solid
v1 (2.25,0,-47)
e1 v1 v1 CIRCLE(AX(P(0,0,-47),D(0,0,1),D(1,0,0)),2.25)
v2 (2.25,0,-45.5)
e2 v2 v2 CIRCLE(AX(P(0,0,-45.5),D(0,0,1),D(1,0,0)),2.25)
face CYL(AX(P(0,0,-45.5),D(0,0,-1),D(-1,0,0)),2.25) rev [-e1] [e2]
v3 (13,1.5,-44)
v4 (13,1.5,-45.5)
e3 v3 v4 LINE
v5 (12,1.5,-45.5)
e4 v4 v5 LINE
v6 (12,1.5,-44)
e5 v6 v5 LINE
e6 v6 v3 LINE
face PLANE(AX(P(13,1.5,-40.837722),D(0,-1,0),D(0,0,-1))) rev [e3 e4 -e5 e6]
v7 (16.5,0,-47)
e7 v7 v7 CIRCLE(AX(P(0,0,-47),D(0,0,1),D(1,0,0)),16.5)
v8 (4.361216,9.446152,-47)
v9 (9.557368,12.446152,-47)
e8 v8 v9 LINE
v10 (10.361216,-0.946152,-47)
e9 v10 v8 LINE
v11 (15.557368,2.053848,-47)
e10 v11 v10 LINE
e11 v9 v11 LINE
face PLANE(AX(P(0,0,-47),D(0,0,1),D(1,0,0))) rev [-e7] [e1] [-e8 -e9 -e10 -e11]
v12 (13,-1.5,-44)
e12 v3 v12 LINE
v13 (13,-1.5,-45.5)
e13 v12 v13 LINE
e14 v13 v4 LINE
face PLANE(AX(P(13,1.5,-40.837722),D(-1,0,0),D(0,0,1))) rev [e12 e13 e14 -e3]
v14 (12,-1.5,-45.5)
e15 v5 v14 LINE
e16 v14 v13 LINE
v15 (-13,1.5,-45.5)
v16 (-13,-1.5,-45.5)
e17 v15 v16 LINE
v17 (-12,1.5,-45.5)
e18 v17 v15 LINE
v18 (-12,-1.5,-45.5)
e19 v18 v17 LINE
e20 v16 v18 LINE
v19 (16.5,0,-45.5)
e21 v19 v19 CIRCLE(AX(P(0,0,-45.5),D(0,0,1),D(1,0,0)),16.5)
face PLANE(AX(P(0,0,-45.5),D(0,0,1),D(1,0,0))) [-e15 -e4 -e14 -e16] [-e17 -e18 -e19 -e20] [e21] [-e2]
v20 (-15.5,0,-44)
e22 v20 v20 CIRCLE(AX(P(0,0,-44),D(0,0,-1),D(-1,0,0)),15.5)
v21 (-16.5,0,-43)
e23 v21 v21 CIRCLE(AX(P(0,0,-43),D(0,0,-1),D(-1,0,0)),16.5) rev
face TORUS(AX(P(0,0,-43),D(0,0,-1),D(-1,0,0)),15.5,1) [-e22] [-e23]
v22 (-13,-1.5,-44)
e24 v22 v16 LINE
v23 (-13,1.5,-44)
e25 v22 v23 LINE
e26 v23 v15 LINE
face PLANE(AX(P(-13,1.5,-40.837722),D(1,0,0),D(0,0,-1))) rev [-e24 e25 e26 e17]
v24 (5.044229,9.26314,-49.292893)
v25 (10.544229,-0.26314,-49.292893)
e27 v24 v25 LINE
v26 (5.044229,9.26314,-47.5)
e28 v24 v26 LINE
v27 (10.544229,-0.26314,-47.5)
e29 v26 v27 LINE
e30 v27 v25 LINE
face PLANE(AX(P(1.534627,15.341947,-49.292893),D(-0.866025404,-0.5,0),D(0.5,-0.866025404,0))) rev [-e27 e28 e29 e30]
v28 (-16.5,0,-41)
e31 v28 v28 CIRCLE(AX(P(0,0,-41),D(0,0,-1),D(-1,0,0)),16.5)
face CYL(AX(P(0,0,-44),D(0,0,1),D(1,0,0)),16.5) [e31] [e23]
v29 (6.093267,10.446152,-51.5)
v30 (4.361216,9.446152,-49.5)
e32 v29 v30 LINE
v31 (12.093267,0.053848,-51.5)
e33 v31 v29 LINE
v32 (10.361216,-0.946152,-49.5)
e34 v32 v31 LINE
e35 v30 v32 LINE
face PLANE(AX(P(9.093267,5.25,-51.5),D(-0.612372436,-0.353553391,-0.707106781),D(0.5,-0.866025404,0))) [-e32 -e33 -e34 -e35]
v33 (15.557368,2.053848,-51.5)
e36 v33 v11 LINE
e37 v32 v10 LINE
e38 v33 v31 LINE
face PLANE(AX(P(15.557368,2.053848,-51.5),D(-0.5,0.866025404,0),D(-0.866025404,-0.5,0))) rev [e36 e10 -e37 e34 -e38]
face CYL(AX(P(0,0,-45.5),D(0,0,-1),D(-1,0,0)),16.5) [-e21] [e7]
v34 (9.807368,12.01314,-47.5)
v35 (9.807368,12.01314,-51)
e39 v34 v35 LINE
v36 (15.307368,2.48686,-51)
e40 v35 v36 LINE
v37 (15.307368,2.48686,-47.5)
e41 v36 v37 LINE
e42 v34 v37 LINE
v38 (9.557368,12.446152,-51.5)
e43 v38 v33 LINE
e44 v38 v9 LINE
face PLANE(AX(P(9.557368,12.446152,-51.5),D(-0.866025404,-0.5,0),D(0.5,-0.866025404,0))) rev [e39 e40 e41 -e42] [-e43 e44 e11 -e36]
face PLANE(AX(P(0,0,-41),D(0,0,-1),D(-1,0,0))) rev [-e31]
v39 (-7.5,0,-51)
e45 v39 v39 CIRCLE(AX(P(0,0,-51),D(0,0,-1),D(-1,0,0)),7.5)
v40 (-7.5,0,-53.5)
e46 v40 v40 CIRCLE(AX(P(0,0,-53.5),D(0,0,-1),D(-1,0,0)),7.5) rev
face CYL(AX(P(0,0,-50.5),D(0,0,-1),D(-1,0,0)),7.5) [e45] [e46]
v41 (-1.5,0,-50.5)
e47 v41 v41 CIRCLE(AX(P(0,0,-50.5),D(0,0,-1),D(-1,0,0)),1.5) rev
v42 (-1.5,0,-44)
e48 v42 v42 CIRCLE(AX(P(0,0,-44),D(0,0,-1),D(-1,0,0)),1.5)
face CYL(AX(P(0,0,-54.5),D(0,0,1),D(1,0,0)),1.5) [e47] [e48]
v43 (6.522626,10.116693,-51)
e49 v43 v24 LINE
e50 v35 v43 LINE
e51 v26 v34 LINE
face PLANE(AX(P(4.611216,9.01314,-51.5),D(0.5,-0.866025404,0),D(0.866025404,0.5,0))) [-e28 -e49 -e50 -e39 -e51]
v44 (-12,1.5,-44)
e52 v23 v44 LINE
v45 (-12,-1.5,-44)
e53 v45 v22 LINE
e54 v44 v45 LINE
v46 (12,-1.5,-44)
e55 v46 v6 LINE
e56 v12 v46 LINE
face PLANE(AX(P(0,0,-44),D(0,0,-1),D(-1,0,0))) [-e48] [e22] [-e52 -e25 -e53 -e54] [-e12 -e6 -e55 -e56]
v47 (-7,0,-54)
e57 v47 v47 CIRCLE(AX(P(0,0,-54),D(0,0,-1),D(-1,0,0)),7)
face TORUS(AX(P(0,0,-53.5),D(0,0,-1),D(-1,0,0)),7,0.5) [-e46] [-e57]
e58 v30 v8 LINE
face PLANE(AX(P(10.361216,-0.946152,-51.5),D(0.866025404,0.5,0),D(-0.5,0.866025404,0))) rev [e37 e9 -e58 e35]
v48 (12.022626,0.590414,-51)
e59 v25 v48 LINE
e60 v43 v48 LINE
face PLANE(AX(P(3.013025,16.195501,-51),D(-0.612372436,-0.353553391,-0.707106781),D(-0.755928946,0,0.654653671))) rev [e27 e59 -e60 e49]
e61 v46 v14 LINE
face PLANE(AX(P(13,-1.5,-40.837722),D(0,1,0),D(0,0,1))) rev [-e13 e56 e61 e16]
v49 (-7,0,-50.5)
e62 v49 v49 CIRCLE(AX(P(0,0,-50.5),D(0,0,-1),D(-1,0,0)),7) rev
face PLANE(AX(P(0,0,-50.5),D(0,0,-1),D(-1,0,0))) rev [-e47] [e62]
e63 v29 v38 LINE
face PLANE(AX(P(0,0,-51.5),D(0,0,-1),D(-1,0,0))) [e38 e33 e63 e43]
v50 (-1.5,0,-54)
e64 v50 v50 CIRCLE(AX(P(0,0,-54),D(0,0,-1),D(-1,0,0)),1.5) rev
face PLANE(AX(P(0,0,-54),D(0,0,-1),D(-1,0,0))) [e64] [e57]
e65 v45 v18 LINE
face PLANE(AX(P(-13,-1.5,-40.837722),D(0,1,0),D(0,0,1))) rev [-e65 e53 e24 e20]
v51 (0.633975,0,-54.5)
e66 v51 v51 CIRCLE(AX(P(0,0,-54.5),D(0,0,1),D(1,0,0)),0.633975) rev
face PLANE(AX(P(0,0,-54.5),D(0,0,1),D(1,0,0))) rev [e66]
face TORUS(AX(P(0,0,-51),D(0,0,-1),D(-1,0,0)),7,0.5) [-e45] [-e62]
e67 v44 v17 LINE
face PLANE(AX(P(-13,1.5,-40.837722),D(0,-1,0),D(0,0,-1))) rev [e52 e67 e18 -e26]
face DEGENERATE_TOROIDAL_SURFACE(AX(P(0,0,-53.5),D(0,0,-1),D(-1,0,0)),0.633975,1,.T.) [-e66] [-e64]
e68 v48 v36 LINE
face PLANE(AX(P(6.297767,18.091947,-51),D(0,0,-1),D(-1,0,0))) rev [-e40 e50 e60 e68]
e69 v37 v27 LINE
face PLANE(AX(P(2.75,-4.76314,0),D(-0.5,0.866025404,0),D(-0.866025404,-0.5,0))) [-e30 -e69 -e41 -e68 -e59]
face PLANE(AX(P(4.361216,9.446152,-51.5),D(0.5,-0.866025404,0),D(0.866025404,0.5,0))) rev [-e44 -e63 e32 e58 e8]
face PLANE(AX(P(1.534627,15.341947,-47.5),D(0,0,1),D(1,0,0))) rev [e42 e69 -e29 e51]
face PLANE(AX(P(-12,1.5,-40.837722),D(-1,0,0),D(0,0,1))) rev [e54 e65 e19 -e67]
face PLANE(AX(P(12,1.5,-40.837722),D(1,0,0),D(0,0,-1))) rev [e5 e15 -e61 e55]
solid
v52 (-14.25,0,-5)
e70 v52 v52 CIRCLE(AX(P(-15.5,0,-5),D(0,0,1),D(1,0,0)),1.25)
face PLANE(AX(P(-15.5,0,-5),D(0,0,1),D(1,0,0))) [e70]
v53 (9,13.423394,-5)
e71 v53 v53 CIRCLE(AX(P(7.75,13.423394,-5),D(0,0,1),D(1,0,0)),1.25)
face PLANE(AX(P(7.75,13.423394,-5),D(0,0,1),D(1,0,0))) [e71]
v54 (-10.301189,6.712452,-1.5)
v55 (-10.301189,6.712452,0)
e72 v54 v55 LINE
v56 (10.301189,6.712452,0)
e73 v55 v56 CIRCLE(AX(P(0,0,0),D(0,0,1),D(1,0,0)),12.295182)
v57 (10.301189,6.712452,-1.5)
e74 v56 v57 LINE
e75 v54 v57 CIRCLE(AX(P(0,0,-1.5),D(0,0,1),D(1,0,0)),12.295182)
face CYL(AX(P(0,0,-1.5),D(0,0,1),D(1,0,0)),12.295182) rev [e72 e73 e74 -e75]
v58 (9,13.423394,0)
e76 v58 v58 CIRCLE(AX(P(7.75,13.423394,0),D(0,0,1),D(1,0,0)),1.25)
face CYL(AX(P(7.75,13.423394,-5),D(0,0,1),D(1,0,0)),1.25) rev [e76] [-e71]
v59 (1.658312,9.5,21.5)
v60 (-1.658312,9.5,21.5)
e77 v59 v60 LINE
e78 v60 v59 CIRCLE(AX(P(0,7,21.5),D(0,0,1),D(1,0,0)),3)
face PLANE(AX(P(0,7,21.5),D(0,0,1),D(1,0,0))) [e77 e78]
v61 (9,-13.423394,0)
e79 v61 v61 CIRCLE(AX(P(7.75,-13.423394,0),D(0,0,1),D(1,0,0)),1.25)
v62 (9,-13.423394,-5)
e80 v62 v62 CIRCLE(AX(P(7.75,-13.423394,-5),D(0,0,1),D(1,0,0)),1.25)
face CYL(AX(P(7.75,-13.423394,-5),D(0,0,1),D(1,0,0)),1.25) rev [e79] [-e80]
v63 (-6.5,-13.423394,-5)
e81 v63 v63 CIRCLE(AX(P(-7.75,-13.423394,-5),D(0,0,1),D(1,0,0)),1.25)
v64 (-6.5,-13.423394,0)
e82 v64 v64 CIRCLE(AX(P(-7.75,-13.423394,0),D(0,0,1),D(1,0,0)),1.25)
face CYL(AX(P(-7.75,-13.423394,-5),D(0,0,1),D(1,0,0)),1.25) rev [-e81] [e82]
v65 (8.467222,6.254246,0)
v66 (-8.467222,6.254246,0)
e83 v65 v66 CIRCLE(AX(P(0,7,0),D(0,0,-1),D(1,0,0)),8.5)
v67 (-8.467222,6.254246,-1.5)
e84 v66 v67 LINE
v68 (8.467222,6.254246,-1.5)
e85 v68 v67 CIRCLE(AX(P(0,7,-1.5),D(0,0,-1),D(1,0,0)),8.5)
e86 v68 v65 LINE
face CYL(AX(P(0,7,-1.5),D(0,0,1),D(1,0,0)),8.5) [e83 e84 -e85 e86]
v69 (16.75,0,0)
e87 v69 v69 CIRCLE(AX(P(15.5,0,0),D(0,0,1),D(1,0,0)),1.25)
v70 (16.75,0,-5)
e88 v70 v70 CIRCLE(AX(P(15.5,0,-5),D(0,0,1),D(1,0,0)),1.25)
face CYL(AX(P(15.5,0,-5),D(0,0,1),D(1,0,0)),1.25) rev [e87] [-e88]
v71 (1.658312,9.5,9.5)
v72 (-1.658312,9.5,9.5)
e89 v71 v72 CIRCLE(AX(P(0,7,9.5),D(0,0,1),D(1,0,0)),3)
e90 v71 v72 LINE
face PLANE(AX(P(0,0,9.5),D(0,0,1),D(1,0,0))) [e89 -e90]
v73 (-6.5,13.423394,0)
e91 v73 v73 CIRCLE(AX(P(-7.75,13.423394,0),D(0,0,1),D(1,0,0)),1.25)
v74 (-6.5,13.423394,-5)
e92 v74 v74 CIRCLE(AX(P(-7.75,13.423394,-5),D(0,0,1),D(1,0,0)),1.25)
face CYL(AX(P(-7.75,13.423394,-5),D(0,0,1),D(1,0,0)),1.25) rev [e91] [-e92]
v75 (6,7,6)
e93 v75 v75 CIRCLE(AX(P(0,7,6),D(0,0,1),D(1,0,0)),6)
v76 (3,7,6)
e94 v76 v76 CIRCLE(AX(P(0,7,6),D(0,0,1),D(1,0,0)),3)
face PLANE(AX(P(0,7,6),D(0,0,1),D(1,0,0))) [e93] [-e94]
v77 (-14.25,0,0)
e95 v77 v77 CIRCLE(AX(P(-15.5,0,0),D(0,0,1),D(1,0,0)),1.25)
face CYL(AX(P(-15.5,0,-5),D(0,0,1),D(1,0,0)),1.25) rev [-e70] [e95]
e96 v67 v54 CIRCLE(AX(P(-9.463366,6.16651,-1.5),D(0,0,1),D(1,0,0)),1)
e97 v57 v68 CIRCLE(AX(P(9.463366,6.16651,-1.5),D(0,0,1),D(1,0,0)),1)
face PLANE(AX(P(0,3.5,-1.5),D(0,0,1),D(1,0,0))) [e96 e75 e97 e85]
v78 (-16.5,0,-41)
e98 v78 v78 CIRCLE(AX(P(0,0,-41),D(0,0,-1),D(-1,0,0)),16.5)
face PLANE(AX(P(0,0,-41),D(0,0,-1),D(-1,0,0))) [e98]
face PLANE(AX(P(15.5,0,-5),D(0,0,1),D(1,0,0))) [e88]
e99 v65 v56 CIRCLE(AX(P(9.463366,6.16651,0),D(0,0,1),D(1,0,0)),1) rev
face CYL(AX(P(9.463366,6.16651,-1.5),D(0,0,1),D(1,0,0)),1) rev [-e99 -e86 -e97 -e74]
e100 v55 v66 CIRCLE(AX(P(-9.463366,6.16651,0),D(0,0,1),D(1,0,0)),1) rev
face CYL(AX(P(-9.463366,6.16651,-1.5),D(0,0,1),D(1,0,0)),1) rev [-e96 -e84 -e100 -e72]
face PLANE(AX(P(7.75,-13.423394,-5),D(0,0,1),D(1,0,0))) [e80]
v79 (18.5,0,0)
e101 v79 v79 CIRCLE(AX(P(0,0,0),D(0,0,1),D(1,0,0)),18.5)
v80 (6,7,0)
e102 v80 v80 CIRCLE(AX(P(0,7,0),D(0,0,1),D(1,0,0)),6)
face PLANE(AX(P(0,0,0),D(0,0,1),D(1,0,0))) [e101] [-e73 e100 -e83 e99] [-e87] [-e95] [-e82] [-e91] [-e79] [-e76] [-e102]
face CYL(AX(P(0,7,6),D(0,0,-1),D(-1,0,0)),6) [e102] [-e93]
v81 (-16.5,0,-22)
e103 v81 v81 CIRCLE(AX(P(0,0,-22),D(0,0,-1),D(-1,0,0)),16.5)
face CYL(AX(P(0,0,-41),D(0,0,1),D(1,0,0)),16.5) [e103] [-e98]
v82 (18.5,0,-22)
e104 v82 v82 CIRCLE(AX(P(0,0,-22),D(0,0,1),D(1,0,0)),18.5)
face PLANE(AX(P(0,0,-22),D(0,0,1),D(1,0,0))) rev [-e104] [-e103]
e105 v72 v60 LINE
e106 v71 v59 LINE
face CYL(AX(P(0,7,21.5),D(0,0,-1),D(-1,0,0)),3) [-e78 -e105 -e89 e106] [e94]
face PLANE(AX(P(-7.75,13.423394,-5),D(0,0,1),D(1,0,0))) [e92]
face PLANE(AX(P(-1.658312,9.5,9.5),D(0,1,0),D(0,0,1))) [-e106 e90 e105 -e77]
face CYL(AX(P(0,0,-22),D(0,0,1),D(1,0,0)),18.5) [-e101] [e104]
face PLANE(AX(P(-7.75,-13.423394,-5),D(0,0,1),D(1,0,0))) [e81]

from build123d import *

# Parameters (mm, degrees)
SKETCH1_R            = 18.5
BOSS_EXTRUDE1_DEPTH  = 22
SKETCH2_R            = 1.25
CUT_EXTRUDE1_DEPTH   = 5
SKETCH3_R            = 6
BOSS_EXTRUDE2_DEPTH  = 6
SKETCH4_R            = 3
BOSS_EXTRUDE3_DEPTH  = 15.5
SKETCH5_OUTSIDE_W    = 52.61
SKETCH5_OUTSIDE_H    = 52.61
CUT_EXTRUDE2_DEPTH   = 12
CUT_EXTRUDE3_DEPTH   = 1.5
FILLET1_R            = 1
SKETCH7_R            = 16.5
BOSS_EXTRUDE4_DEPTH  = 19
SKETCH8_R            = 16.5
BOSS_EXTRUDE5_DEPTH  = 3
FILLET2_R            = 1
BOSS_EXTRUDE6_START  = 10
SKETCH9_R            = 7.5
BOSS_EXTRUDE6_DEPTH  = 3.5
BOSS_EXTRUDE7_START  = -4
SKETCH10_R           = 1.5
BOSS_EXTRUDE7_DEPTH  = 10.5
BOSS_EXTRUDE8_START  = 5
SKETCH11_R           = 16.5
SKETCH11_R_2         = 2.25
BOSS_EXTRUDE8_DEPTH  = 1.5
SKETCH12_W           = 1
SKETCH12_H           = 3
BOSS_EXTRUDE9_DEPTH  = 1.5
BOSS_EXTRUDE10_DEPTH = 4.5
CHAMFER1_SIZE        = 2
CUT_EXTRUDE4_START   = -0.5
CUT_EXTRUDE4_DEPTH   = 11
FILLET3_R            = 1
FILLET4_R            = 0.5


with BuildPart() as part:
    # Sketch1 → Boss-Extrude1 (new body)
    with BuildSketch(Plane.XY):
        Circle(SKETCH1_R)
    extrude(amount=-BOSS_EXTRUDE1_DEPTH)

    # Sketch2 → Cut-Extrude1 (cut)
    with BuildSketch(Plane.XY):
        with Locations((-15.5, 0)):
            Circle(SKETCH2_R)
        with Locations((-7.75, 13.423393759)):
            Circle(SKETCH2_R)
        with Locations((7.75, 13.423393759)):
            Circle(SKETCH2_R)
        with Locations((15.5, 0)):
            Circle(SKETCH2_R)
        with Locations((7.75, -13.423393759)):
            Circle(SKETCH2_R)
        with Locations((-7.75, -13.423393759)):
            Circle(SKETCH2_R)
    extrude(amount=-CUT_EXTRUDE1_DEPTH, mode=Mode.SUBTRACT)

    # Sketch3 → Boss-Extrude2 (add)
    with BuildSketch(Plane.XY):
        with Locations((0, 7)):
            Circle(SKETCH3_R)
    extrude(amount=BOSS_EXTRUDE2_DEPTH)

    # Sketch4 → Boss-Extrude3 (add)
    with BuildSketch(Plane.XY.offset(6)):
        with Locations((0, 7)):
            Circle(SKETCH4_R)
    extrude(amount=BOSS_EXTRUDE3_DEPTH)

    # Sketch5 outside → Cut-Extrude2 (cut)
    with BuildSketch(Plane.XY.offset(21.5)):
        Rectangle(SKETCH5_OUTSIDE_W, SKETCH5_OUTSIDE_H)
        with BuildLine():
            Line((-1.658312395, 9.5), (1.658312395, 9.5))
            ThreePointArc((1.658312395, 9.5), (0, 4), (-1.658312395, 9.5))
        make_face(mode=Mode.SUBTRACT)
    extrude(amount=-CUT_EXTRUDE2_DEPTH, mode=Mode.SUBTRACT)

    # Sketch6 → Cut-Extrude3 (cut)
    with BuildSketch(Plane.XY):
        with BuildLine():
            ThreePointArc((-8.226916879, 9.137250258), (0, -12.29518213), (8.226916879, 9.137250258))
            ThreePointArc((8.226916879, 9.137250258), (0, -1.5), (-8.226916879, 9.137250258))
        make_face()
    extrude(amount=-CUT_EXTRUDE3_DEPTH, mode=Mode.SUBTRACT)

    # Fillet1
    fillet1_edges = [part.edges().sort_by_distance(p)[0] for p in [
        (-8.226916879, 9.137250258, -0.75),
        (8.226916879, 9.137250258, -0.75),
    ]]
    fillet(fillet1_edges, radius=FILLET1_R)

    # Sketch7 → Boss-Extrude4 (add)
    with BuildSketch(Plane(origin=(0, 0, -22), x_dir=(-1, 0, 0), z_dir=(0, 0, -1))):
        Circle(SKETCH7_R)
    extrude(amount=BOSS_EXTRUDE4_DEPTH)


with BuildPart() as body_2:
    # Sketch8 → Boss-Extrude5 (new body)
    with BuildSketch(Plane(origin=(0, 0, -41), x_dir=(-1, 0, 0), z_dir=(0, 0, -1))):
        Circle(SKETCH8_R)
    extrude(amount=BOSS_EXTRUDE5_DEPTH)

    # Fillet2
    fillet2_edges = [body_2.edges().sort_by_distance(p)[0] for p in [
        (16.5, 0, -44),
    ]]
    fillet(fillet2_edges, radius=FILLET2_R)



with BuildPart() as body_3:
    # Sketch9 → Boss-Extrude6 (new body)
    with BuildSketch(Plane(origin=(0, 0, -44), x_dir=(-1, 0, 0), z_dir=(0, 0, -1)).offset(BOSS_EXTRUDE6_START)):
        Circle(SKETCH9_R)
    extrude(amount=-BOSS_EXTRUDE6_DEPTH)


with BuildPart() as body_2_1:
    add(body_2.part)

    add(body_3.part)  # Boss-Extrude7 merges body 3
    # Sketch10 → Boss-Extrude7 (add)
    with BuildSketch(Plane.XY.offset(-50.5).offset(BOSS_EXTRUDE7_START)):
        with Locations(Location((0, 0, 0), (0, 0, 180))):
            Circle(SKETCH10_R)
    extrude(amount=BOSS_EXTRUDE7_DEPTH)



with BuildPart() as body_3_2:
    # Sketch11 → Boss-Extrude8 (new body)
    with BuildSketch(Plane.XY.offset(-50.5).offset(BOSS_EXTRUDE8_START)):
        with Locations(Location((0, 0, 0), (0, 0, 180))):
            Circle(SKETCH11_R)
        Circle(SKETCH11_R_2, mode=Mode.SUBTRACT)
    extrude(amount=-BOSS_EXTRUDE8_DEPTH)


with BuildPart() as body_2_2:
    add(body_2_1.part)

    add(body_3_2.part)  # Boss-Extrude9 merges body 3 2
    # Sketch12 → Boss-Extrude9 (add)
    with BuildSketch(Plane.XY.offset(-45.5)):
        with Locations((-12.5, 0)):
            Rectangle(SKETCH12_W, SKETCH12_H)
        with Locations((12.5, 0)):
            Rectangle(SKETCH12_W, SKETCH12_H)
    extrude(amount=BOSS_EXTRUDE9_DEPTH)

    # Sketch13 → Boss-Extrude10 (add)
    with BuildSketch(Plane(origin=(0, 0, -47), x_dir=(-1, 0, 0), z_dir=(0, 0, -1))):
        Polygon((-10.361215932, -0.946152423), (-4.361215932, 9.446152423), (-9.557368355, 12.446152423), (-15.557368355, 2.053847577), align=None)
    extrude(amount=BOSS_EXTRUDE10_DEPTH)

    # Chamfer1
    chamfer1_edges = [body_2_2.edges().sort_by_distance(p)[0] for p in [
        (7.361215932, 4.25, -51.5),
    ]]
    chamfer(chamfer1_edges, length=CHAMFER1_SIZE)

    # Sketch15 → Cut-Extrude4 (cut)
    with BuildSketch(Plane(origin=(3, -5.196152423, 0), x_dir=(0.8660254037844364, 0.5000000000000041, 0), z_dir=(0.5000000000000041, -0.8660254037844364, 0)).offset(CUT_EXTRUDE4_START)):
        Polygon((9, -47.5), (14.5, -47.5), (14.5, -51), (10.707106781, -51), (9, -49.292893219), align=None)
    extrude(amount=-CUT_EXTRUDE4_DEPTH, mode=Mode.SUBTRACT)

    # Fillet3
    # the kernel refuses this fillet: 1 mm, written as the material it takes off along each edge
    with BuildSketch(Plane(origin=(0, 0, -54.5), x_dir=(-1, 0, 0), z_dir=(0, 1, 0))) as fillet3_piece_1:
        with BuildLine():
            CenterArc((0.633974596, 1), FILLET3_R, 270, 60)
            Line((0.633974596, 0), (0.633974596, -0.02))
            Line((0.633974596, -0.02), (1.5, -0.02))
            Line((1.5, -0.02), (1.52, 0))
            ThreePointArc((1.52, 0), (1.52, 0.25), (1.517320508, 0.49))
            Line((1.517320508, 0.49), (1.5, 0.5))
        make_face()
    revolve(axis=Axis((0, 0, -54.5), (0, 0, 1)), mode=Mode.SUBTRACT)

    # Fillet4
    fillet4_edges = [body_2_2.edges().sort_by_distance(p)[0] for p in [
        (7.5, 0, -50.5),
        (7.5, 0, -54),
    ]]
    fillet(fillet4_edges, radius=FILLET4_R)


solid = Compound([part.part, body_2_2.part])
